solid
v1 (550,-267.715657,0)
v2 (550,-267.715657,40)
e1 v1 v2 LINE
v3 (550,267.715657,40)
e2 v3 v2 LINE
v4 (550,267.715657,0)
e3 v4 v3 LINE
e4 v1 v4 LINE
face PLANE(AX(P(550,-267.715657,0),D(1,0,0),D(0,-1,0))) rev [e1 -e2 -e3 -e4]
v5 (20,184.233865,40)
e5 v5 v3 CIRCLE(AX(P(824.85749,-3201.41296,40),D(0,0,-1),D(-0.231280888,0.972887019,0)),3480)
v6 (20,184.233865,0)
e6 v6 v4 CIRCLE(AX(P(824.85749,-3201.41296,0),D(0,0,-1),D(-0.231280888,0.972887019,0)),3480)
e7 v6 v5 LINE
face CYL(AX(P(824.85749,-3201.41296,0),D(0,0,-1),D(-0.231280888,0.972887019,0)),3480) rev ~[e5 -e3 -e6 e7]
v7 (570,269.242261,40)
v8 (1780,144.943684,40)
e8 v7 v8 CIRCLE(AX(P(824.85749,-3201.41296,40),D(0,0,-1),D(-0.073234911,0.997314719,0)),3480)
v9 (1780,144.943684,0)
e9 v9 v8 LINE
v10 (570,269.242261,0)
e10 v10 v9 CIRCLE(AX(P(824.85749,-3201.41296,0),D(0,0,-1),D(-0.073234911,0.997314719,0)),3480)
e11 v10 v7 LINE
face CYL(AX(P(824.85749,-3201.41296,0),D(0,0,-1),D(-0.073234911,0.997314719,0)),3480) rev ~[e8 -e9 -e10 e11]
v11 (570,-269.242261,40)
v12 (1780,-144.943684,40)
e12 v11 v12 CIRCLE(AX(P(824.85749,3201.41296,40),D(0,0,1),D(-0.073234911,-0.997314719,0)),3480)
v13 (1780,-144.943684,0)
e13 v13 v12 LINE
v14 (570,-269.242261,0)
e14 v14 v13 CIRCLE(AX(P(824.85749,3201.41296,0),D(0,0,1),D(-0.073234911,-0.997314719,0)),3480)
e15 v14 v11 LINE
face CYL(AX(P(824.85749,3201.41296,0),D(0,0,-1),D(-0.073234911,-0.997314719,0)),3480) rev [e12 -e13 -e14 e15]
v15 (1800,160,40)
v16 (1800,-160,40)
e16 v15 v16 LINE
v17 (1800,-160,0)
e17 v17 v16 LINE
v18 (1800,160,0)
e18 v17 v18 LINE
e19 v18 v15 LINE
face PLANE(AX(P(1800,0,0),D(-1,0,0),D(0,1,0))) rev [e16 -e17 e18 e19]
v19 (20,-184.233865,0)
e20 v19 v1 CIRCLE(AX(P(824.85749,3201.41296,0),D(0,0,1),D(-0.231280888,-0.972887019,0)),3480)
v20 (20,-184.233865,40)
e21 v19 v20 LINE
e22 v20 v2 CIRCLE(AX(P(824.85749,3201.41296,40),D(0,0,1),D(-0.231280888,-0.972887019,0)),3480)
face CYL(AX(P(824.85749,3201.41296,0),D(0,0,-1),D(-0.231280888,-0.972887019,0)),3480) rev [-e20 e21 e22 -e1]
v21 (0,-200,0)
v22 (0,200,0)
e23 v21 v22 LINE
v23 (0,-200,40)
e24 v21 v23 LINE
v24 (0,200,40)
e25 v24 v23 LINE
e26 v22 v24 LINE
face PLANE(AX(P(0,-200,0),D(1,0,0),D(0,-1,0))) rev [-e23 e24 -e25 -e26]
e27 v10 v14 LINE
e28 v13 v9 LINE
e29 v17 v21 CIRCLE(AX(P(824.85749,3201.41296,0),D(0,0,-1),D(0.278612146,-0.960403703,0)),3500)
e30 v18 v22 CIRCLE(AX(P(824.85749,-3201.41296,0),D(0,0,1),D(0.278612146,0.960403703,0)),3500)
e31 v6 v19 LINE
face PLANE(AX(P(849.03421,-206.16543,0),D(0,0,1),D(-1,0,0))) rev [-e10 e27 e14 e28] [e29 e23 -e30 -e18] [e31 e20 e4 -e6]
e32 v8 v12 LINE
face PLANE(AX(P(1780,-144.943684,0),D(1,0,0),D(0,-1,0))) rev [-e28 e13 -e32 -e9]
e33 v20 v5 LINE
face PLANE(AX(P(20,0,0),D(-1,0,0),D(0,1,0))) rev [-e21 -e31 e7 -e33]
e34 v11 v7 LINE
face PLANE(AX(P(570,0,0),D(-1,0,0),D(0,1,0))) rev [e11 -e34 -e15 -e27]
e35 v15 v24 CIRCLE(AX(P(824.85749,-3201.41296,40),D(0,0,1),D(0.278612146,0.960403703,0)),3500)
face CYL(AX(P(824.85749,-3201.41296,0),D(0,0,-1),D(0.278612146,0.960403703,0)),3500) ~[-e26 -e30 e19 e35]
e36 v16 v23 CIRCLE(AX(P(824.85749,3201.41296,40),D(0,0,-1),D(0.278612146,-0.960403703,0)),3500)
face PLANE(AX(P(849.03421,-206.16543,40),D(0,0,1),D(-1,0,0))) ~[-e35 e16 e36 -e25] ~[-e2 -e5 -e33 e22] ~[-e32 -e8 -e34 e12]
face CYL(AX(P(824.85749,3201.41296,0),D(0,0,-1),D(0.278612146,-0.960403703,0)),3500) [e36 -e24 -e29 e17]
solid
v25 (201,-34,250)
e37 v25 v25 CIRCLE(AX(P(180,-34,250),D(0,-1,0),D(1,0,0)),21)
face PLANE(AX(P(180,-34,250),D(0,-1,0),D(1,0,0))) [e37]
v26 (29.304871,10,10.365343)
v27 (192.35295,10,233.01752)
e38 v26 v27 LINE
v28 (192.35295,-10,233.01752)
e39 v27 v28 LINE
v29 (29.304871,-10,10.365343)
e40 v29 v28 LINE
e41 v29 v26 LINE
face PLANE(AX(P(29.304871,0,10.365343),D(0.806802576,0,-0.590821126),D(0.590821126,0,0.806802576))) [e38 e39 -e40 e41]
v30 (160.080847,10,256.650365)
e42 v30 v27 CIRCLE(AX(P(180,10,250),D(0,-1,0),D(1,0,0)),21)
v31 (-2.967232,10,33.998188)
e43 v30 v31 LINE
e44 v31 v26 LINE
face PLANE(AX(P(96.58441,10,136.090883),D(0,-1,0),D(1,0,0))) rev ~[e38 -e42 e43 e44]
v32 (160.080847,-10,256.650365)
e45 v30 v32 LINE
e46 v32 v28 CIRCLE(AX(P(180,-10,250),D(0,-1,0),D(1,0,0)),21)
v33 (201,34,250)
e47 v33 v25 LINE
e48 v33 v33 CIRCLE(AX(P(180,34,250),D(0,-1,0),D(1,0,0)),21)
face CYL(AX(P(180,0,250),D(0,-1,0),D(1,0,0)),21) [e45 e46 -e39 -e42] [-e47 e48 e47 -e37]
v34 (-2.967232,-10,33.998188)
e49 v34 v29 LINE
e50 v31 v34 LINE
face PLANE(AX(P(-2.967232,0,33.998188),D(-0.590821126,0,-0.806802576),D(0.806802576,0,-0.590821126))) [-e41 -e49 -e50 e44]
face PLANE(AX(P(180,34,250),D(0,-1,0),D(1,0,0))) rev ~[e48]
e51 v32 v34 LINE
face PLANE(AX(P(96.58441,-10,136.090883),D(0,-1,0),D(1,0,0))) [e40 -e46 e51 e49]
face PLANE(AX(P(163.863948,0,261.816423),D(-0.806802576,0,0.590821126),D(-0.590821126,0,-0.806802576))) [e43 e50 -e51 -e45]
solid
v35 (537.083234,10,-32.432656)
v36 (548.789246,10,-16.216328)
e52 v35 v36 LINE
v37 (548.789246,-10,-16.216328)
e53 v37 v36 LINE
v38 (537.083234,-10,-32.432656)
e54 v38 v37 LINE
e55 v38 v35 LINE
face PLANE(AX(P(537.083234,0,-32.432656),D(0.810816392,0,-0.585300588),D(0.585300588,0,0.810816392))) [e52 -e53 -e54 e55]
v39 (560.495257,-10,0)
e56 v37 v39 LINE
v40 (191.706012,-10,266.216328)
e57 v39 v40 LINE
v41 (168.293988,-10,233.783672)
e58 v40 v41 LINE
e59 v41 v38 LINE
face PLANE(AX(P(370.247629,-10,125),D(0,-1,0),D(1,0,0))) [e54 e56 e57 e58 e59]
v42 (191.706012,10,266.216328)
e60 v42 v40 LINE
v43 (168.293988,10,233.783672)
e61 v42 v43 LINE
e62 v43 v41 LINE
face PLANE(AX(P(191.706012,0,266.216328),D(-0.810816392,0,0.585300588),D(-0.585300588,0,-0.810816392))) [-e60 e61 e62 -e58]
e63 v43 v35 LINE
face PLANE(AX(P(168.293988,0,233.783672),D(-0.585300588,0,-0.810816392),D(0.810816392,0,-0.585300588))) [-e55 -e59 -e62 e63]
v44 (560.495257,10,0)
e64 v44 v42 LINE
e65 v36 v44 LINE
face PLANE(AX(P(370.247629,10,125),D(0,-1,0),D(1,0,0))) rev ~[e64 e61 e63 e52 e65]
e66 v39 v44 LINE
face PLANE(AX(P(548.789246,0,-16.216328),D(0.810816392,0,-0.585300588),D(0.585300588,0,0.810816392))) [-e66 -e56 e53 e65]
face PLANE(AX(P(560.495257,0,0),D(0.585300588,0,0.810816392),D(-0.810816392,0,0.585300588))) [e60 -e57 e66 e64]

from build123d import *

# Parameters (mm, degrees)
F1_DEPTH = 40
F3_R     = 21
F4_DEPTH = 34
F6_DEPTH = 10
F8_DEPTH = 10


with BuildPart() as f1:
    # F0 (on Top) → F1 (new body)
    with BuildSketch(Plane.XY):
        with BuildLine():
            Line((1800, 0), (1800, 160))
            ThreePointArc((1800, 160), (902.6160702853, 297.723162839), (0, 200))
            Line((0, 200), (0, 0))
            Line((0, 0), (20, 0))
            Line((20, 0), (20, 184.2338650593))
            ThreePointArc((20, 184.2338650593), (283.3887356677, 236.2041785507), (550, 267.7156572871))
            Line((550, 267.7156572871), (550, 0))
            Line((550, 0), (570, 0))
            Line((570, 0), (570, 269.2422609738))
            ThreePointArc((570, 269.2422609738), (1180.4728881109, 260.3694842678), (1780, 144.9436838818))
            Line((1780, 144.9436838818), (1780, 0))
            Line((1780, 0), (1800, 0))
        make_face()
    extrude(amount=F1_DEPTH)

    # F2: F1 across plane


with BuildPart() as f1_1:
    add(f1.part)
    add(f1.part.mirror(Plane.XZ))


with BuildPart() as f4:
    # F3 (on Front) → F4 (new body, symmetric)
    with BuildSketch(Plane.XZ):
        with Locations((180, 250)):
            Circle(F3_R)
    extrude(amount=F4_DEPTH, both=True)

    # F5 (on Front) → F6 (join, symmetric)
    with BuildSketch(Plane.XZ):
        Polygon((196.1360515255, 238.1835774803), (163.8639484745, 261.8164225197), (-2.9672317155, 33.9981877608), (29.3048713356, 10.3653427213), align=None)
    extrude(amount=F6_DEPTH, both=True)


with BuildPart() as f8:
    # F7 (on Front) → F8 (new body, symmetric)
    with BuildSketch(Plane.XZ):
        Polygon((560.4952573776, 0), (191.7060117653, 266.216327838), (180, 250), (548.7892456123, -16.216327838), align=None)
        Polygon((548.7892456123, -16.216327838), (180, 250), (168.2939882347, 233.783672162), (537.083233847, -32.4326556761), align=None)
    extrude(amount=F8_DEPTH, both=True)


solid = Compound([f1_1.part, f4.part, f8.part])
